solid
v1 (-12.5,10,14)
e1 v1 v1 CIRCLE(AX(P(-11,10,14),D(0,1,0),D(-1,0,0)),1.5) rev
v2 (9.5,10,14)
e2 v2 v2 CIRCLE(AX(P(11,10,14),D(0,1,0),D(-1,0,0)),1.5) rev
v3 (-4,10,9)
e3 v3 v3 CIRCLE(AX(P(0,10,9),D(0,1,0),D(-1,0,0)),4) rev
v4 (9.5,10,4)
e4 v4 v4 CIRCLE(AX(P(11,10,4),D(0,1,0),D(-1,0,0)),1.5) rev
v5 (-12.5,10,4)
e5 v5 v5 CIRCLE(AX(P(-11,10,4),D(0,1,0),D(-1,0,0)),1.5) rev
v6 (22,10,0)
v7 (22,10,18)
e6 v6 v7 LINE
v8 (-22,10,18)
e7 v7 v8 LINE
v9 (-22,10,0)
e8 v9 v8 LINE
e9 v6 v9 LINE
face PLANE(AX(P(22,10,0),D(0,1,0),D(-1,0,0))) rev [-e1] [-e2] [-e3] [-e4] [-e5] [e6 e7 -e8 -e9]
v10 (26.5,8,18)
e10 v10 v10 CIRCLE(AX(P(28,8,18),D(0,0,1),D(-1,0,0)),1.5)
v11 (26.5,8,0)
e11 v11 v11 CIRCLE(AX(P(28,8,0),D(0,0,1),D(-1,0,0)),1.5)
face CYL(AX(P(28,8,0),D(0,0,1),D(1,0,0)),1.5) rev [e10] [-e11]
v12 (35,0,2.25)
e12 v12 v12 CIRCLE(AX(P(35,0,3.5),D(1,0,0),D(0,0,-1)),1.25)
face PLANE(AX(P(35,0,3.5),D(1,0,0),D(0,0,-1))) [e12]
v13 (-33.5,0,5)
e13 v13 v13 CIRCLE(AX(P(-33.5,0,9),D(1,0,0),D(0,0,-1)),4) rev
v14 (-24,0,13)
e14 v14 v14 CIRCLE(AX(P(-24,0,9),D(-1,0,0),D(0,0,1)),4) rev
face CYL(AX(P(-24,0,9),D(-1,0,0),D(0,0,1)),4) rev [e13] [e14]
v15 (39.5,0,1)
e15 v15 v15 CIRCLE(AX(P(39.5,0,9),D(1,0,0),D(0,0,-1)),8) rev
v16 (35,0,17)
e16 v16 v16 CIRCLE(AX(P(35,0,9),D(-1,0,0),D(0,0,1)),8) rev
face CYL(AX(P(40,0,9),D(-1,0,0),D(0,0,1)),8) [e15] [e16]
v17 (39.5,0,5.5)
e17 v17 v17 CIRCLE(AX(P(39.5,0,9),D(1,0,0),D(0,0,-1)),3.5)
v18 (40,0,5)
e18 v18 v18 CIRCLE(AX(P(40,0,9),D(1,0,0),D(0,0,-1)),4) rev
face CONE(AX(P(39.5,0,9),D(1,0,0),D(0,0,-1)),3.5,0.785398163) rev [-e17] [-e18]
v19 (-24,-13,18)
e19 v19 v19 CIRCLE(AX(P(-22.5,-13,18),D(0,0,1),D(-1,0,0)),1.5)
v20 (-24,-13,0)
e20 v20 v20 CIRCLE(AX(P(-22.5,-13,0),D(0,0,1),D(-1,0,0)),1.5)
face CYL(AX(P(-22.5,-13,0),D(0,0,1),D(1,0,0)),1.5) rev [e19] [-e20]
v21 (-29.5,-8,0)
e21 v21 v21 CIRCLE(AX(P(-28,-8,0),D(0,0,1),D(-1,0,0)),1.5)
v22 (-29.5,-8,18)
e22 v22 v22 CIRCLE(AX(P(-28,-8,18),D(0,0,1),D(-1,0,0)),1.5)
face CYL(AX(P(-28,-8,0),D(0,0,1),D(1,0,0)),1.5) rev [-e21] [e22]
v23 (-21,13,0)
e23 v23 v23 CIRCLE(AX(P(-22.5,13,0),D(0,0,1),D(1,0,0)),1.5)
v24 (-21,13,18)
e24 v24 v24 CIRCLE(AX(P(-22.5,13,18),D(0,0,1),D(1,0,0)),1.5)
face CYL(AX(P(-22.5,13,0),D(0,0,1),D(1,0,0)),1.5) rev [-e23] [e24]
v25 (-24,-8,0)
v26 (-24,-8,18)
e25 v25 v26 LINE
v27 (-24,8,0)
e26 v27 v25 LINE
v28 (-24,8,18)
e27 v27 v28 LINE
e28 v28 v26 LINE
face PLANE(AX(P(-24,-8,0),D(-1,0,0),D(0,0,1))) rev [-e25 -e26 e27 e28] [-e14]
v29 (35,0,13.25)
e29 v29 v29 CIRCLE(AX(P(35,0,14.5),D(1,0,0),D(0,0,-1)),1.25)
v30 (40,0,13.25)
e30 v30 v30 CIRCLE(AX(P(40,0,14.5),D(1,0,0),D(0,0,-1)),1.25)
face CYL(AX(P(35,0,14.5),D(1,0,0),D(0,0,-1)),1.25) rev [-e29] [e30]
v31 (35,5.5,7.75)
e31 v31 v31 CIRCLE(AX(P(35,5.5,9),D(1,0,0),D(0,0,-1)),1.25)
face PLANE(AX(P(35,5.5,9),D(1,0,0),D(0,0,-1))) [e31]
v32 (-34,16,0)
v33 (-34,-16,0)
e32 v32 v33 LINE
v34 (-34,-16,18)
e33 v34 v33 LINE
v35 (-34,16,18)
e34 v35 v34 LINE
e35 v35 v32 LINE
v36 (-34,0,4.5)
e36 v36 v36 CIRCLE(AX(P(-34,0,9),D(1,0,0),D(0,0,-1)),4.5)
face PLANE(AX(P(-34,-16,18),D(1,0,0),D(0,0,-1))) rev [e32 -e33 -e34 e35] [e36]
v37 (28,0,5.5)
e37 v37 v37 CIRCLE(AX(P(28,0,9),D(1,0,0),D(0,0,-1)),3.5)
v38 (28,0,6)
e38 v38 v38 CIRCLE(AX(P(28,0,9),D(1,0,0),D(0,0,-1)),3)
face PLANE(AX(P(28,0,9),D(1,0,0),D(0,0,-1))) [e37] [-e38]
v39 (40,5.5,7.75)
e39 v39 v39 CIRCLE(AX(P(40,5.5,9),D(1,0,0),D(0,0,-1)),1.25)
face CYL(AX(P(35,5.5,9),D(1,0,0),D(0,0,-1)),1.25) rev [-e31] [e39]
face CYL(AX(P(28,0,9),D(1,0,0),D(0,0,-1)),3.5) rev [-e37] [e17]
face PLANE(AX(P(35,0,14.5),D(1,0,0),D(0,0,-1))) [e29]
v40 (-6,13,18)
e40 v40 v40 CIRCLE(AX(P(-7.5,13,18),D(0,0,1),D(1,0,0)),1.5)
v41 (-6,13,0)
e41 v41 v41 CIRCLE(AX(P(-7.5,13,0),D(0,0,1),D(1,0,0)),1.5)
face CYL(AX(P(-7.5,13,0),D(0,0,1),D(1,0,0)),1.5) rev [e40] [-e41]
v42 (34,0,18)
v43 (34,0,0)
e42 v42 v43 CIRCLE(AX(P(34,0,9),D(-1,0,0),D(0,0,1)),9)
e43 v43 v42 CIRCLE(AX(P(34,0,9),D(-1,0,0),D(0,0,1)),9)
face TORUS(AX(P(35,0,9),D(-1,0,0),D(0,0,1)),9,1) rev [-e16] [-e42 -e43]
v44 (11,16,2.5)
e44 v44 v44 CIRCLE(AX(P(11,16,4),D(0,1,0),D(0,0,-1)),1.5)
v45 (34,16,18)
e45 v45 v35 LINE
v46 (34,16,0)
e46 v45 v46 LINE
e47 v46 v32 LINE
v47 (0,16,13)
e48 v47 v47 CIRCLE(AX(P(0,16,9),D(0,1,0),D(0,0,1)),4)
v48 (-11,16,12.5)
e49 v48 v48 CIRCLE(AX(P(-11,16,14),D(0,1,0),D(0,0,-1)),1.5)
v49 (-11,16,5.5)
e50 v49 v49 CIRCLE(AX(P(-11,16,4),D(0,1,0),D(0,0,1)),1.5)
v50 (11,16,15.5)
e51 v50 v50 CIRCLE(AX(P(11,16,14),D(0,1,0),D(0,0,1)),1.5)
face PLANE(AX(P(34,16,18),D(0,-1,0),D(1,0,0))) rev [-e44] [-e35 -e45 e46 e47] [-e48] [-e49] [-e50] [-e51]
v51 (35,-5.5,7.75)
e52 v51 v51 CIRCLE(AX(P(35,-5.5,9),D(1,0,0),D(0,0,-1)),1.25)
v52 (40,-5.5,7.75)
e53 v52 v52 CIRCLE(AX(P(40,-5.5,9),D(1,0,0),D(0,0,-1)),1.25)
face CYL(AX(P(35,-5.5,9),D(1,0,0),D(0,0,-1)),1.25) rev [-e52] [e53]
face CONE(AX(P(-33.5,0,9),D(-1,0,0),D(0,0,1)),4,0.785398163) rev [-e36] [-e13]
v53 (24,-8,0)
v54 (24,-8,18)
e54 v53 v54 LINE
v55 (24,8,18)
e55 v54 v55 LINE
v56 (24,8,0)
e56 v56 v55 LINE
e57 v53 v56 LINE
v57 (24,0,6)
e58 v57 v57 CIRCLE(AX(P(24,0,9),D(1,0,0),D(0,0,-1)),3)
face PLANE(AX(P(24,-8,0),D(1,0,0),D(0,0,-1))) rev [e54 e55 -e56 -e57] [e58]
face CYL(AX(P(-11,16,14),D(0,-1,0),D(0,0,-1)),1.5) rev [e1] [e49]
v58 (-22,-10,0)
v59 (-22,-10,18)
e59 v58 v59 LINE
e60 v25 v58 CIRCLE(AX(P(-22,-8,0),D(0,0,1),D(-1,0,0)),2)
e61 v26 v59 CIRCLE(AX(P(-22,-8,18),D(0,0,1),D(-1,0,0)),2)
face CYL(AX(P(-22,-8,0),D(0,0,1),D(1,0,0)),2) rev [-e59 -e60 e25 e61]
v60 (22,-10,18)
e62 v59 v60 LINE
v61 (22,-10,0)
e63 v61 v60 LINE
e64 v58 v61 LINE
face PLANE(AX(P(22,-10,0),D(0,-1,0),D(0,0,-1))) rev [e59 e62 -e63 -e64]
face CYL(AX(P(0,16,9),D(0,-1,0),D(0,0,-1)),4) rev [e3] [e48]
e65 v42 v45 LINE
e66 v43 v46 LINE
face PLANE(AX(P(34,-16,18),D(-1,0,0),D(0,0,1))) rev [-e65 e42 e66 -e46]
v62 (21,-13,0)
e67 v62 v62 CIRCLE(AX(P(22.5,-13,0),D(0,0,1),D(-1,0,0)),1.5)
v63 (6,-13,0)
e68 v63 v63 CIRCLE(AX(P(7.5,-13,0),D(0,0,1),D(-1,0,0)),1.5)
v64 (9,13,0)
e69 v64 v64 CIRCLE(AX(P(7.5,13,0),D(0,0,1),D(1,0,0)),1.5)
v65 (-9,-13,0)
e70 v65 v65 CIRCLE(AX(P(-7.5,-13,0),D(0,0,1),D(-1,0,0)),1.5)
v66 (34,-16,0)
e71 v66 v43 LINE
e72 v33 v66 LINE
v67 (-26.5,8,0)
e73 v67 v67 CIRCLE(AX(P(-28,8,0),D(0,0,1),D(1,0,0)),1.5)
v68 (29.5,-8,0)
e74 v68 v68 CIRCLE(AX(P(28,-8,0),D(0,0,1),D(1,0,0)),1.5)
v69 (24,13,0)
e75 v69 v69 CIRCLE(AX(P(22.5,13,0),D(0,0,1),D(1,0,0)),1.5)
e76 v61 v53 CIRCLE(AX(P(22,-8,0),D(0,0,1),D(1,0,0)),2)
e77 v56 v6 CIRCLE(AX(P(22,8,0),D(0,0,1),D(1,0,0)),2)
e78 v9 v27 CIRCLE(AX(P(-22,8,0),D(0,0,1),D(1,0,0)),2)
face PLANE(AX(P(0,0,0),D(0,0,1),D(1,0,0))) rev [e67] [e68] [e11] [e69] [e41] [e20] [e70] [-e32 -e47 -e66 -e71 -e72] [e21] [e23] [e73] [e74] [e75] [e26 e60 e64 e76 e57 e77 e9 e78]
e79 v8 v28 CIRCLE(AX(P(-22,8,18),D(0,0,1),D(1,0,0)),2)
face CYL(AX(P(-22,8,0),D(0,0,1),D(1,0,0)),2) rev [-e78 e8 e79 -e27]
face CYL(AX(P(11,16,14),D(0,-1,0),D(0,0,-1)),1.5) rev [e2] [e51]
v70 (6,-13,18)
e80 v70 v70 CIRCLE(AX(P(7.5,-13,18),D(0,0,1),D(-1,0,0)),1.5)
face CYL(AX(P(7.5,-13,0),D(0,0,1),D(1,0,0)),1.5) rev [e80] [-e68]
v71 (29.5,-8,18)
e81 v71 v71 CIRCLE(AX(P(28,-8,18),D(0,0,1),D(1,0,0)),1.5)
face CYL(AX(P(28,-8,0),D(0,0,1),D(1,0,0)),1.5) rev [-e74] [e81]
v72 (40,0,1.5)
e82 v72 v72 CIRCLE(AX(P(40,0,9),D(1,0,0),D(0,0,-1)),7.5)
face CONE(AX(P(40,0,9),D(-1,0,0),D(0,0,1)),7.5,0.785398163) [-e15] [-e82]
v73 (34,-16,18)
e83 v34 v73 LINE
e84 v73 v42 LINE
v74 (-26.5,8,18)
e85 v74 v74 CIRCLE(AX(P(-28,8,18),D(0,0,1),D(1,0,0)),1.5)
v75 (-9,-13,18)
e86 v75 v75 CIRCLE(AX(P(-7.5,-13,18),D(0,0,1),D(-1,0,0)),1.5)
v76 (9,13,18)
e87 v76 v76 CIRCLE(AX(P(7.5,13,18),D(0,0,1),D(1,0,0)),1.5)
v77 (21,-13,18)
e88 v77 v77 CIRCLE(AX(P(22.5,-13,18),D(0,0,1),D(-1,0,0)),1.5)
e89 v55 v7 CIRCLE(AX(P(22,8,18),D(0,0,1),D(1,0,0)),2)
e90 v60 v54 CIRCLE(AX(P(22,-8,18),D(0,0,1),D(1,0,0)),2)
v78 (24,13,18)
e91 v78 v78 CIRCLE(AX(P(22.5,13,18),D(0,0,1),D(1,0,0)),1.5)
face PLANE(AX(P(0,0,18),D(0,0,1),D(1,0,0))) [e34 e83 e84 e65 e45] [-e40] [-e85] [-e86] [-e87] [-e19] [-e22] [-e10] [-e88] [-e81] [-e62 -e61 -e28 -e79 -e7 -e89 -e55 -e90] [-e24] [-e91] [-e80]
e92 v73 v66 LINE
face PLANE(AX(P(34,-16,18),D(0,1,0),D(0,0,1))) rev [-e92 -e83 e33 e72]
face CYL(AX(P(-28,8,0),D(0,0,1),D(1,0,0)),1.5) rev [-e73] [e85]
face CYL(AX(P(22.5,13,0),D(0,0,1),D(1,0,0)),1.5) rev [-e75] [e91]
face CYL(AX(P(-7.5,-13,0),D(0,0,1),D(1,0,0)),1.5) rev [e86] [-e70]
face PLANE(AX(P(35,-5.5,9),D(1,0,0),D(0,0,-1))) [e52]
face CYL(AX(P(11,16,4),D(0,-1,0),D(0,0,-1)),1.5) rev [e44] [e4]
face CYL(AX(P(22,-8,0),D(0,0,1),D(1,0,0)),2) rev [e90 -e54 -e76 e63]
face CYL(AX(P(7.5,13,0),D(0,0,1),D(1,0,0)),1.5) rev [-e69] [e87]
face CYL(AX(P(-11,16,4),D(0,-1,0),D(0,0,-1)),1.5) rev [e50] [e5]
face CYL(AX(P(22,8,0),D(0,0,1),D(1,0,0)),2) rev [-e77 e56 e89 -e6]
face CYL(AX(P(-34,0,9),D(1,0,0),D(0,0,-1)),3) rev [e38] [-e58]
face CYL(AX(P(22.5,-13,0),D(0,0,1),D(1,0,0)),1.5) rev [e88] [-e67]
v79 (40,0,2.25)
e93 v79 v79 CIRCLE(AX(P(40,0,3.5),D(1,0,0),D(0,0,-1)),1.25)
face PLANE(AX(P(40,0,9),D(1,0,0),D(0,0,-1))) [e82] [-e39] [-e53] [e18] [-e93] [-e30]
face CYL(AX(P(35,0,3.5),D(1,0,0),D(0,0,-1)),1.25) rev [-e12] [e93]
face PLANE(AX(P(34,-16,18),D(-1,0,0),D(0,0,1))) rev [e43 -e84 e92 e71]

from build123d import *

# Parameters (mm, degrees)
SKETCH2_W           = 68
SKETCH2_H           = 32
BOSS_EXTRUDE1_DEPTH = 18
SKETCH3_R           = 8
BOSS_EXTRUDE2_DEPTH = 6
FILLET1_R           = 1
SKETCH4_R           = 4
CUT_EXTRUDE1_DEPTH  = 10
CUT_EXTRUDE2_DEPTH  = 47.69047012
SKETCH6_R           = 1.5
CUT_EXTRUDE3_DEPTH  = 47.69047012
SKETCH7_R           = 3.5
CUT_EXTRUDE4_DEPTH  = 12
SKETCH8_R           = 3
CUT_EXTRUDE5_DEPTH  = 67.513156593
SKETCH9_R           = 1.25
CUT_EXTRUDE6_DEPTH  = 5
SKETCH10_R          = 4
SKETCH10_R_2        = 1.5
CUT_EXTRUDE9_DEPTH  = 47.69047012
CHAMFER1_SIZE       = 0.5
CHAMFER2_SIZE       = 0.5


with BuildPart() as part:
    # Sketch2 → Boss-Extrude1 (new body)
    with BuildSketch(Plane.XY):
        Rectangle(SKETCH2_W, SKETCH2_H)
    extrude(amount=BOSS_EXTRUDE1_DEPTH)

    # Sketch3 → Boss-Extrude2 (add)
    with BuildSketch(Plane(origin=(34, 0, 0), x_dir=(0, 0, -1), z_dir=(1, 0, 0))):
        with Locations((-9, 0)):
            Circle(SKETCH3_R)
    extrude(amount=BOSS_EXTRUDE2_DEPTH)

    # Fillet1
    fillet1_edges = [part.edges().sort_by_distance(p)[0] for p in [
        (34, 0, 17),
    ]]
    fillet(fillet1_edges, radius=FILLET1_R - 0.0001)  # a hair under: the kernel refuses the full size

    # Sketch4 → Cut-Extrude1 (cut)
    with BuildSketch(Plane.ZY.offset(34)):
        with Locations((9, 0)):
            Circle(SKETCH4_R)
    extrude(amount=-CUT_EXTRUDE1_DEPTH, mode=Mode.SUBTRACT)

    # Sketch5 → Cut-Extrude2 (cut, through all)
    with BuildSketch(Plane.XY.offset(18)):
        with BuildLine():
            Line((22, -10), (-22, -10))
            ThreePointArc((-22, -10), (-23.414213562, -9.414213562), (-24, -8))
            Line((-24, -8), (-24, 8))
            ThreePointArc((-24, 8), (-23.414213562, 9.414213562), (-22, 10))
            Line((-22, 10), (22, 10))
            ThreePointArc((22, 10), (23.414213562, 9.414213562), (24, 8))
            Line((24, 8), (24, -8))
            ThreePointArc((24, -8), (23.414213562, -9.414213562), (22, -10))
        make_face()
    extrude(amount=-CUT_EXTRUDE2_DEPTH, mode=Mode.SUBTRACT)

    # Sketch6 → Cut-Extrude3 (cut, through all)
    with BuildSketch(Plane.XY.offset(18)):
        with Locations((-22.5, 13)):
            Circle(SKETCH6_R)
        with Locations((-7.5, 13)):
            Circle(SKETCH6_R)
        with Locations((7.5, 13)):
            Circle(SKETCH6_R)
        with Locations((22.5, 13)):
            Circle(SKETCH6_R)
        with Locations(Location((22.5, -13, 0), (0, 0, 180))):
            Circle(SKETCH6_R)
        with Locations(Location((7.5, -13, 0), (0, 0, 180))):
            Circle(SKETCH6_R)
        with Locations(Location((-7.5, -13, 0), (0, 0, 180))):
            Circle(SKETCH6_R)
        with Locations(Location((-22.5, -13, 0), (0, 0, 180))):
            Circle(SKETCH6_R)
        with Locations((28, -8)):
            Circle(SKETCH6_R)
        with Locations(Location((28, 8, 0), (0, 0, 180))):
            Circle(SKETCH6_R)
        with Locations((-28, 8)):
            Circle(SKETCH6_R)
        with Locations(Location((-28, -8, 0), (0, 0, 180))):
            Circle(SKETCH6_R)
    extrude(amount=-CUT_EXTRUDE3_DEPTH, mode=Mode.SUBTRACT)

    # Sketch7 → Cut-Extrude4 (cut)
    with BuildSketch(Plane(origin=(40, 0, 0), x_dir=(0, 0, -1), z_dir=(1, 0, 0))):
        with Locations((-9, 0)):
            Circle(SKETCH7_R)
    extrude(amount=-CUT_EXTRUDE4_DEPTH, mode=Mode.SUBTRACT)

    # Sketch8 → Cut-Extrude5 (cut, through all)
    with BuildSketch(Plane(origin=(28, 0, 0), x_dir=(0, 0, -1), z_dir=(1, 0, 0))):
        with Locations((-9, 0)):
            Circle(SKETCH8_R)
    extrude(amount=-CUT_EXTRUDE5_DEPTH, mode=Mode.SUBTRACT)

    # Sketch9 → Cut-Extrude6 (cut)
    with BuildSketch(Plane(origin=(40, 0, 0), x_dir=(0, 0, -1), z_dir=(1, 0, 0))):
        with Locations((-9, 5.5)):
            Circle(SKETCH9_R)
        with Locations((-9, -5.5)):
            Circle(SKETCH9_R)
        with Locations((-3.5, 0)):
            Circle(SKETCH9_R)
        with Locations((-14.5, 0)):
            Circle(SKETCH9_R)
    extrude(amount=-CUT_EXTRUDE6_DEPTH, mode=Mode.SUBTRACT)

    # Sketch10 → Cut-Extrude9 (cut, through all)
    with BuildSketch(Plane(origin=(0, 0, 0), x_dir=(1, 0, 0), z_dir=(0, 1, 0))):
        with Locations(Location((0, -9, 0), (0, 0, 180))):
            Circle(SKETCH10_R)
        with Locations(Location((-11, -4, 0), (0, 0, 180))):
            Circle(SKETCH10_R_2)
        with Locations(Location((11, -4, 0), (0, 0, 90))):
            Circle(SKETCH10_R_2)
        with Locations(Location((11, -14, 0), (0, 0, 180))):
            Circle(SKETCH10_R_2)
        with Locations(Location((-11, -14, 0), (0, 0, 90))):
            Circle(SKETCH10_R_2)
    extrude(amount=CUT_EXTRUDE9_DEPTH, mode=Mode.SUBTRACT)

    # Chamfer1
    chamfer1_edges = [part.edges().sort_by_distance(p)[0] for p in [
        (-34, 0, 5),
    ]]
    chamfer(chamfer1_edges, length=CHAMFER1_SIZE)

    # Chamfer2
    chamfer2_edges = [part.edges().sort_by_distance(p)[0] for p in [
        (40, 0, 12.5),
        (40, 0, 17),
    ]]
    chamfer(chamfer2_edges, length=CHAMFER2_SIZE)


solid = part.part
